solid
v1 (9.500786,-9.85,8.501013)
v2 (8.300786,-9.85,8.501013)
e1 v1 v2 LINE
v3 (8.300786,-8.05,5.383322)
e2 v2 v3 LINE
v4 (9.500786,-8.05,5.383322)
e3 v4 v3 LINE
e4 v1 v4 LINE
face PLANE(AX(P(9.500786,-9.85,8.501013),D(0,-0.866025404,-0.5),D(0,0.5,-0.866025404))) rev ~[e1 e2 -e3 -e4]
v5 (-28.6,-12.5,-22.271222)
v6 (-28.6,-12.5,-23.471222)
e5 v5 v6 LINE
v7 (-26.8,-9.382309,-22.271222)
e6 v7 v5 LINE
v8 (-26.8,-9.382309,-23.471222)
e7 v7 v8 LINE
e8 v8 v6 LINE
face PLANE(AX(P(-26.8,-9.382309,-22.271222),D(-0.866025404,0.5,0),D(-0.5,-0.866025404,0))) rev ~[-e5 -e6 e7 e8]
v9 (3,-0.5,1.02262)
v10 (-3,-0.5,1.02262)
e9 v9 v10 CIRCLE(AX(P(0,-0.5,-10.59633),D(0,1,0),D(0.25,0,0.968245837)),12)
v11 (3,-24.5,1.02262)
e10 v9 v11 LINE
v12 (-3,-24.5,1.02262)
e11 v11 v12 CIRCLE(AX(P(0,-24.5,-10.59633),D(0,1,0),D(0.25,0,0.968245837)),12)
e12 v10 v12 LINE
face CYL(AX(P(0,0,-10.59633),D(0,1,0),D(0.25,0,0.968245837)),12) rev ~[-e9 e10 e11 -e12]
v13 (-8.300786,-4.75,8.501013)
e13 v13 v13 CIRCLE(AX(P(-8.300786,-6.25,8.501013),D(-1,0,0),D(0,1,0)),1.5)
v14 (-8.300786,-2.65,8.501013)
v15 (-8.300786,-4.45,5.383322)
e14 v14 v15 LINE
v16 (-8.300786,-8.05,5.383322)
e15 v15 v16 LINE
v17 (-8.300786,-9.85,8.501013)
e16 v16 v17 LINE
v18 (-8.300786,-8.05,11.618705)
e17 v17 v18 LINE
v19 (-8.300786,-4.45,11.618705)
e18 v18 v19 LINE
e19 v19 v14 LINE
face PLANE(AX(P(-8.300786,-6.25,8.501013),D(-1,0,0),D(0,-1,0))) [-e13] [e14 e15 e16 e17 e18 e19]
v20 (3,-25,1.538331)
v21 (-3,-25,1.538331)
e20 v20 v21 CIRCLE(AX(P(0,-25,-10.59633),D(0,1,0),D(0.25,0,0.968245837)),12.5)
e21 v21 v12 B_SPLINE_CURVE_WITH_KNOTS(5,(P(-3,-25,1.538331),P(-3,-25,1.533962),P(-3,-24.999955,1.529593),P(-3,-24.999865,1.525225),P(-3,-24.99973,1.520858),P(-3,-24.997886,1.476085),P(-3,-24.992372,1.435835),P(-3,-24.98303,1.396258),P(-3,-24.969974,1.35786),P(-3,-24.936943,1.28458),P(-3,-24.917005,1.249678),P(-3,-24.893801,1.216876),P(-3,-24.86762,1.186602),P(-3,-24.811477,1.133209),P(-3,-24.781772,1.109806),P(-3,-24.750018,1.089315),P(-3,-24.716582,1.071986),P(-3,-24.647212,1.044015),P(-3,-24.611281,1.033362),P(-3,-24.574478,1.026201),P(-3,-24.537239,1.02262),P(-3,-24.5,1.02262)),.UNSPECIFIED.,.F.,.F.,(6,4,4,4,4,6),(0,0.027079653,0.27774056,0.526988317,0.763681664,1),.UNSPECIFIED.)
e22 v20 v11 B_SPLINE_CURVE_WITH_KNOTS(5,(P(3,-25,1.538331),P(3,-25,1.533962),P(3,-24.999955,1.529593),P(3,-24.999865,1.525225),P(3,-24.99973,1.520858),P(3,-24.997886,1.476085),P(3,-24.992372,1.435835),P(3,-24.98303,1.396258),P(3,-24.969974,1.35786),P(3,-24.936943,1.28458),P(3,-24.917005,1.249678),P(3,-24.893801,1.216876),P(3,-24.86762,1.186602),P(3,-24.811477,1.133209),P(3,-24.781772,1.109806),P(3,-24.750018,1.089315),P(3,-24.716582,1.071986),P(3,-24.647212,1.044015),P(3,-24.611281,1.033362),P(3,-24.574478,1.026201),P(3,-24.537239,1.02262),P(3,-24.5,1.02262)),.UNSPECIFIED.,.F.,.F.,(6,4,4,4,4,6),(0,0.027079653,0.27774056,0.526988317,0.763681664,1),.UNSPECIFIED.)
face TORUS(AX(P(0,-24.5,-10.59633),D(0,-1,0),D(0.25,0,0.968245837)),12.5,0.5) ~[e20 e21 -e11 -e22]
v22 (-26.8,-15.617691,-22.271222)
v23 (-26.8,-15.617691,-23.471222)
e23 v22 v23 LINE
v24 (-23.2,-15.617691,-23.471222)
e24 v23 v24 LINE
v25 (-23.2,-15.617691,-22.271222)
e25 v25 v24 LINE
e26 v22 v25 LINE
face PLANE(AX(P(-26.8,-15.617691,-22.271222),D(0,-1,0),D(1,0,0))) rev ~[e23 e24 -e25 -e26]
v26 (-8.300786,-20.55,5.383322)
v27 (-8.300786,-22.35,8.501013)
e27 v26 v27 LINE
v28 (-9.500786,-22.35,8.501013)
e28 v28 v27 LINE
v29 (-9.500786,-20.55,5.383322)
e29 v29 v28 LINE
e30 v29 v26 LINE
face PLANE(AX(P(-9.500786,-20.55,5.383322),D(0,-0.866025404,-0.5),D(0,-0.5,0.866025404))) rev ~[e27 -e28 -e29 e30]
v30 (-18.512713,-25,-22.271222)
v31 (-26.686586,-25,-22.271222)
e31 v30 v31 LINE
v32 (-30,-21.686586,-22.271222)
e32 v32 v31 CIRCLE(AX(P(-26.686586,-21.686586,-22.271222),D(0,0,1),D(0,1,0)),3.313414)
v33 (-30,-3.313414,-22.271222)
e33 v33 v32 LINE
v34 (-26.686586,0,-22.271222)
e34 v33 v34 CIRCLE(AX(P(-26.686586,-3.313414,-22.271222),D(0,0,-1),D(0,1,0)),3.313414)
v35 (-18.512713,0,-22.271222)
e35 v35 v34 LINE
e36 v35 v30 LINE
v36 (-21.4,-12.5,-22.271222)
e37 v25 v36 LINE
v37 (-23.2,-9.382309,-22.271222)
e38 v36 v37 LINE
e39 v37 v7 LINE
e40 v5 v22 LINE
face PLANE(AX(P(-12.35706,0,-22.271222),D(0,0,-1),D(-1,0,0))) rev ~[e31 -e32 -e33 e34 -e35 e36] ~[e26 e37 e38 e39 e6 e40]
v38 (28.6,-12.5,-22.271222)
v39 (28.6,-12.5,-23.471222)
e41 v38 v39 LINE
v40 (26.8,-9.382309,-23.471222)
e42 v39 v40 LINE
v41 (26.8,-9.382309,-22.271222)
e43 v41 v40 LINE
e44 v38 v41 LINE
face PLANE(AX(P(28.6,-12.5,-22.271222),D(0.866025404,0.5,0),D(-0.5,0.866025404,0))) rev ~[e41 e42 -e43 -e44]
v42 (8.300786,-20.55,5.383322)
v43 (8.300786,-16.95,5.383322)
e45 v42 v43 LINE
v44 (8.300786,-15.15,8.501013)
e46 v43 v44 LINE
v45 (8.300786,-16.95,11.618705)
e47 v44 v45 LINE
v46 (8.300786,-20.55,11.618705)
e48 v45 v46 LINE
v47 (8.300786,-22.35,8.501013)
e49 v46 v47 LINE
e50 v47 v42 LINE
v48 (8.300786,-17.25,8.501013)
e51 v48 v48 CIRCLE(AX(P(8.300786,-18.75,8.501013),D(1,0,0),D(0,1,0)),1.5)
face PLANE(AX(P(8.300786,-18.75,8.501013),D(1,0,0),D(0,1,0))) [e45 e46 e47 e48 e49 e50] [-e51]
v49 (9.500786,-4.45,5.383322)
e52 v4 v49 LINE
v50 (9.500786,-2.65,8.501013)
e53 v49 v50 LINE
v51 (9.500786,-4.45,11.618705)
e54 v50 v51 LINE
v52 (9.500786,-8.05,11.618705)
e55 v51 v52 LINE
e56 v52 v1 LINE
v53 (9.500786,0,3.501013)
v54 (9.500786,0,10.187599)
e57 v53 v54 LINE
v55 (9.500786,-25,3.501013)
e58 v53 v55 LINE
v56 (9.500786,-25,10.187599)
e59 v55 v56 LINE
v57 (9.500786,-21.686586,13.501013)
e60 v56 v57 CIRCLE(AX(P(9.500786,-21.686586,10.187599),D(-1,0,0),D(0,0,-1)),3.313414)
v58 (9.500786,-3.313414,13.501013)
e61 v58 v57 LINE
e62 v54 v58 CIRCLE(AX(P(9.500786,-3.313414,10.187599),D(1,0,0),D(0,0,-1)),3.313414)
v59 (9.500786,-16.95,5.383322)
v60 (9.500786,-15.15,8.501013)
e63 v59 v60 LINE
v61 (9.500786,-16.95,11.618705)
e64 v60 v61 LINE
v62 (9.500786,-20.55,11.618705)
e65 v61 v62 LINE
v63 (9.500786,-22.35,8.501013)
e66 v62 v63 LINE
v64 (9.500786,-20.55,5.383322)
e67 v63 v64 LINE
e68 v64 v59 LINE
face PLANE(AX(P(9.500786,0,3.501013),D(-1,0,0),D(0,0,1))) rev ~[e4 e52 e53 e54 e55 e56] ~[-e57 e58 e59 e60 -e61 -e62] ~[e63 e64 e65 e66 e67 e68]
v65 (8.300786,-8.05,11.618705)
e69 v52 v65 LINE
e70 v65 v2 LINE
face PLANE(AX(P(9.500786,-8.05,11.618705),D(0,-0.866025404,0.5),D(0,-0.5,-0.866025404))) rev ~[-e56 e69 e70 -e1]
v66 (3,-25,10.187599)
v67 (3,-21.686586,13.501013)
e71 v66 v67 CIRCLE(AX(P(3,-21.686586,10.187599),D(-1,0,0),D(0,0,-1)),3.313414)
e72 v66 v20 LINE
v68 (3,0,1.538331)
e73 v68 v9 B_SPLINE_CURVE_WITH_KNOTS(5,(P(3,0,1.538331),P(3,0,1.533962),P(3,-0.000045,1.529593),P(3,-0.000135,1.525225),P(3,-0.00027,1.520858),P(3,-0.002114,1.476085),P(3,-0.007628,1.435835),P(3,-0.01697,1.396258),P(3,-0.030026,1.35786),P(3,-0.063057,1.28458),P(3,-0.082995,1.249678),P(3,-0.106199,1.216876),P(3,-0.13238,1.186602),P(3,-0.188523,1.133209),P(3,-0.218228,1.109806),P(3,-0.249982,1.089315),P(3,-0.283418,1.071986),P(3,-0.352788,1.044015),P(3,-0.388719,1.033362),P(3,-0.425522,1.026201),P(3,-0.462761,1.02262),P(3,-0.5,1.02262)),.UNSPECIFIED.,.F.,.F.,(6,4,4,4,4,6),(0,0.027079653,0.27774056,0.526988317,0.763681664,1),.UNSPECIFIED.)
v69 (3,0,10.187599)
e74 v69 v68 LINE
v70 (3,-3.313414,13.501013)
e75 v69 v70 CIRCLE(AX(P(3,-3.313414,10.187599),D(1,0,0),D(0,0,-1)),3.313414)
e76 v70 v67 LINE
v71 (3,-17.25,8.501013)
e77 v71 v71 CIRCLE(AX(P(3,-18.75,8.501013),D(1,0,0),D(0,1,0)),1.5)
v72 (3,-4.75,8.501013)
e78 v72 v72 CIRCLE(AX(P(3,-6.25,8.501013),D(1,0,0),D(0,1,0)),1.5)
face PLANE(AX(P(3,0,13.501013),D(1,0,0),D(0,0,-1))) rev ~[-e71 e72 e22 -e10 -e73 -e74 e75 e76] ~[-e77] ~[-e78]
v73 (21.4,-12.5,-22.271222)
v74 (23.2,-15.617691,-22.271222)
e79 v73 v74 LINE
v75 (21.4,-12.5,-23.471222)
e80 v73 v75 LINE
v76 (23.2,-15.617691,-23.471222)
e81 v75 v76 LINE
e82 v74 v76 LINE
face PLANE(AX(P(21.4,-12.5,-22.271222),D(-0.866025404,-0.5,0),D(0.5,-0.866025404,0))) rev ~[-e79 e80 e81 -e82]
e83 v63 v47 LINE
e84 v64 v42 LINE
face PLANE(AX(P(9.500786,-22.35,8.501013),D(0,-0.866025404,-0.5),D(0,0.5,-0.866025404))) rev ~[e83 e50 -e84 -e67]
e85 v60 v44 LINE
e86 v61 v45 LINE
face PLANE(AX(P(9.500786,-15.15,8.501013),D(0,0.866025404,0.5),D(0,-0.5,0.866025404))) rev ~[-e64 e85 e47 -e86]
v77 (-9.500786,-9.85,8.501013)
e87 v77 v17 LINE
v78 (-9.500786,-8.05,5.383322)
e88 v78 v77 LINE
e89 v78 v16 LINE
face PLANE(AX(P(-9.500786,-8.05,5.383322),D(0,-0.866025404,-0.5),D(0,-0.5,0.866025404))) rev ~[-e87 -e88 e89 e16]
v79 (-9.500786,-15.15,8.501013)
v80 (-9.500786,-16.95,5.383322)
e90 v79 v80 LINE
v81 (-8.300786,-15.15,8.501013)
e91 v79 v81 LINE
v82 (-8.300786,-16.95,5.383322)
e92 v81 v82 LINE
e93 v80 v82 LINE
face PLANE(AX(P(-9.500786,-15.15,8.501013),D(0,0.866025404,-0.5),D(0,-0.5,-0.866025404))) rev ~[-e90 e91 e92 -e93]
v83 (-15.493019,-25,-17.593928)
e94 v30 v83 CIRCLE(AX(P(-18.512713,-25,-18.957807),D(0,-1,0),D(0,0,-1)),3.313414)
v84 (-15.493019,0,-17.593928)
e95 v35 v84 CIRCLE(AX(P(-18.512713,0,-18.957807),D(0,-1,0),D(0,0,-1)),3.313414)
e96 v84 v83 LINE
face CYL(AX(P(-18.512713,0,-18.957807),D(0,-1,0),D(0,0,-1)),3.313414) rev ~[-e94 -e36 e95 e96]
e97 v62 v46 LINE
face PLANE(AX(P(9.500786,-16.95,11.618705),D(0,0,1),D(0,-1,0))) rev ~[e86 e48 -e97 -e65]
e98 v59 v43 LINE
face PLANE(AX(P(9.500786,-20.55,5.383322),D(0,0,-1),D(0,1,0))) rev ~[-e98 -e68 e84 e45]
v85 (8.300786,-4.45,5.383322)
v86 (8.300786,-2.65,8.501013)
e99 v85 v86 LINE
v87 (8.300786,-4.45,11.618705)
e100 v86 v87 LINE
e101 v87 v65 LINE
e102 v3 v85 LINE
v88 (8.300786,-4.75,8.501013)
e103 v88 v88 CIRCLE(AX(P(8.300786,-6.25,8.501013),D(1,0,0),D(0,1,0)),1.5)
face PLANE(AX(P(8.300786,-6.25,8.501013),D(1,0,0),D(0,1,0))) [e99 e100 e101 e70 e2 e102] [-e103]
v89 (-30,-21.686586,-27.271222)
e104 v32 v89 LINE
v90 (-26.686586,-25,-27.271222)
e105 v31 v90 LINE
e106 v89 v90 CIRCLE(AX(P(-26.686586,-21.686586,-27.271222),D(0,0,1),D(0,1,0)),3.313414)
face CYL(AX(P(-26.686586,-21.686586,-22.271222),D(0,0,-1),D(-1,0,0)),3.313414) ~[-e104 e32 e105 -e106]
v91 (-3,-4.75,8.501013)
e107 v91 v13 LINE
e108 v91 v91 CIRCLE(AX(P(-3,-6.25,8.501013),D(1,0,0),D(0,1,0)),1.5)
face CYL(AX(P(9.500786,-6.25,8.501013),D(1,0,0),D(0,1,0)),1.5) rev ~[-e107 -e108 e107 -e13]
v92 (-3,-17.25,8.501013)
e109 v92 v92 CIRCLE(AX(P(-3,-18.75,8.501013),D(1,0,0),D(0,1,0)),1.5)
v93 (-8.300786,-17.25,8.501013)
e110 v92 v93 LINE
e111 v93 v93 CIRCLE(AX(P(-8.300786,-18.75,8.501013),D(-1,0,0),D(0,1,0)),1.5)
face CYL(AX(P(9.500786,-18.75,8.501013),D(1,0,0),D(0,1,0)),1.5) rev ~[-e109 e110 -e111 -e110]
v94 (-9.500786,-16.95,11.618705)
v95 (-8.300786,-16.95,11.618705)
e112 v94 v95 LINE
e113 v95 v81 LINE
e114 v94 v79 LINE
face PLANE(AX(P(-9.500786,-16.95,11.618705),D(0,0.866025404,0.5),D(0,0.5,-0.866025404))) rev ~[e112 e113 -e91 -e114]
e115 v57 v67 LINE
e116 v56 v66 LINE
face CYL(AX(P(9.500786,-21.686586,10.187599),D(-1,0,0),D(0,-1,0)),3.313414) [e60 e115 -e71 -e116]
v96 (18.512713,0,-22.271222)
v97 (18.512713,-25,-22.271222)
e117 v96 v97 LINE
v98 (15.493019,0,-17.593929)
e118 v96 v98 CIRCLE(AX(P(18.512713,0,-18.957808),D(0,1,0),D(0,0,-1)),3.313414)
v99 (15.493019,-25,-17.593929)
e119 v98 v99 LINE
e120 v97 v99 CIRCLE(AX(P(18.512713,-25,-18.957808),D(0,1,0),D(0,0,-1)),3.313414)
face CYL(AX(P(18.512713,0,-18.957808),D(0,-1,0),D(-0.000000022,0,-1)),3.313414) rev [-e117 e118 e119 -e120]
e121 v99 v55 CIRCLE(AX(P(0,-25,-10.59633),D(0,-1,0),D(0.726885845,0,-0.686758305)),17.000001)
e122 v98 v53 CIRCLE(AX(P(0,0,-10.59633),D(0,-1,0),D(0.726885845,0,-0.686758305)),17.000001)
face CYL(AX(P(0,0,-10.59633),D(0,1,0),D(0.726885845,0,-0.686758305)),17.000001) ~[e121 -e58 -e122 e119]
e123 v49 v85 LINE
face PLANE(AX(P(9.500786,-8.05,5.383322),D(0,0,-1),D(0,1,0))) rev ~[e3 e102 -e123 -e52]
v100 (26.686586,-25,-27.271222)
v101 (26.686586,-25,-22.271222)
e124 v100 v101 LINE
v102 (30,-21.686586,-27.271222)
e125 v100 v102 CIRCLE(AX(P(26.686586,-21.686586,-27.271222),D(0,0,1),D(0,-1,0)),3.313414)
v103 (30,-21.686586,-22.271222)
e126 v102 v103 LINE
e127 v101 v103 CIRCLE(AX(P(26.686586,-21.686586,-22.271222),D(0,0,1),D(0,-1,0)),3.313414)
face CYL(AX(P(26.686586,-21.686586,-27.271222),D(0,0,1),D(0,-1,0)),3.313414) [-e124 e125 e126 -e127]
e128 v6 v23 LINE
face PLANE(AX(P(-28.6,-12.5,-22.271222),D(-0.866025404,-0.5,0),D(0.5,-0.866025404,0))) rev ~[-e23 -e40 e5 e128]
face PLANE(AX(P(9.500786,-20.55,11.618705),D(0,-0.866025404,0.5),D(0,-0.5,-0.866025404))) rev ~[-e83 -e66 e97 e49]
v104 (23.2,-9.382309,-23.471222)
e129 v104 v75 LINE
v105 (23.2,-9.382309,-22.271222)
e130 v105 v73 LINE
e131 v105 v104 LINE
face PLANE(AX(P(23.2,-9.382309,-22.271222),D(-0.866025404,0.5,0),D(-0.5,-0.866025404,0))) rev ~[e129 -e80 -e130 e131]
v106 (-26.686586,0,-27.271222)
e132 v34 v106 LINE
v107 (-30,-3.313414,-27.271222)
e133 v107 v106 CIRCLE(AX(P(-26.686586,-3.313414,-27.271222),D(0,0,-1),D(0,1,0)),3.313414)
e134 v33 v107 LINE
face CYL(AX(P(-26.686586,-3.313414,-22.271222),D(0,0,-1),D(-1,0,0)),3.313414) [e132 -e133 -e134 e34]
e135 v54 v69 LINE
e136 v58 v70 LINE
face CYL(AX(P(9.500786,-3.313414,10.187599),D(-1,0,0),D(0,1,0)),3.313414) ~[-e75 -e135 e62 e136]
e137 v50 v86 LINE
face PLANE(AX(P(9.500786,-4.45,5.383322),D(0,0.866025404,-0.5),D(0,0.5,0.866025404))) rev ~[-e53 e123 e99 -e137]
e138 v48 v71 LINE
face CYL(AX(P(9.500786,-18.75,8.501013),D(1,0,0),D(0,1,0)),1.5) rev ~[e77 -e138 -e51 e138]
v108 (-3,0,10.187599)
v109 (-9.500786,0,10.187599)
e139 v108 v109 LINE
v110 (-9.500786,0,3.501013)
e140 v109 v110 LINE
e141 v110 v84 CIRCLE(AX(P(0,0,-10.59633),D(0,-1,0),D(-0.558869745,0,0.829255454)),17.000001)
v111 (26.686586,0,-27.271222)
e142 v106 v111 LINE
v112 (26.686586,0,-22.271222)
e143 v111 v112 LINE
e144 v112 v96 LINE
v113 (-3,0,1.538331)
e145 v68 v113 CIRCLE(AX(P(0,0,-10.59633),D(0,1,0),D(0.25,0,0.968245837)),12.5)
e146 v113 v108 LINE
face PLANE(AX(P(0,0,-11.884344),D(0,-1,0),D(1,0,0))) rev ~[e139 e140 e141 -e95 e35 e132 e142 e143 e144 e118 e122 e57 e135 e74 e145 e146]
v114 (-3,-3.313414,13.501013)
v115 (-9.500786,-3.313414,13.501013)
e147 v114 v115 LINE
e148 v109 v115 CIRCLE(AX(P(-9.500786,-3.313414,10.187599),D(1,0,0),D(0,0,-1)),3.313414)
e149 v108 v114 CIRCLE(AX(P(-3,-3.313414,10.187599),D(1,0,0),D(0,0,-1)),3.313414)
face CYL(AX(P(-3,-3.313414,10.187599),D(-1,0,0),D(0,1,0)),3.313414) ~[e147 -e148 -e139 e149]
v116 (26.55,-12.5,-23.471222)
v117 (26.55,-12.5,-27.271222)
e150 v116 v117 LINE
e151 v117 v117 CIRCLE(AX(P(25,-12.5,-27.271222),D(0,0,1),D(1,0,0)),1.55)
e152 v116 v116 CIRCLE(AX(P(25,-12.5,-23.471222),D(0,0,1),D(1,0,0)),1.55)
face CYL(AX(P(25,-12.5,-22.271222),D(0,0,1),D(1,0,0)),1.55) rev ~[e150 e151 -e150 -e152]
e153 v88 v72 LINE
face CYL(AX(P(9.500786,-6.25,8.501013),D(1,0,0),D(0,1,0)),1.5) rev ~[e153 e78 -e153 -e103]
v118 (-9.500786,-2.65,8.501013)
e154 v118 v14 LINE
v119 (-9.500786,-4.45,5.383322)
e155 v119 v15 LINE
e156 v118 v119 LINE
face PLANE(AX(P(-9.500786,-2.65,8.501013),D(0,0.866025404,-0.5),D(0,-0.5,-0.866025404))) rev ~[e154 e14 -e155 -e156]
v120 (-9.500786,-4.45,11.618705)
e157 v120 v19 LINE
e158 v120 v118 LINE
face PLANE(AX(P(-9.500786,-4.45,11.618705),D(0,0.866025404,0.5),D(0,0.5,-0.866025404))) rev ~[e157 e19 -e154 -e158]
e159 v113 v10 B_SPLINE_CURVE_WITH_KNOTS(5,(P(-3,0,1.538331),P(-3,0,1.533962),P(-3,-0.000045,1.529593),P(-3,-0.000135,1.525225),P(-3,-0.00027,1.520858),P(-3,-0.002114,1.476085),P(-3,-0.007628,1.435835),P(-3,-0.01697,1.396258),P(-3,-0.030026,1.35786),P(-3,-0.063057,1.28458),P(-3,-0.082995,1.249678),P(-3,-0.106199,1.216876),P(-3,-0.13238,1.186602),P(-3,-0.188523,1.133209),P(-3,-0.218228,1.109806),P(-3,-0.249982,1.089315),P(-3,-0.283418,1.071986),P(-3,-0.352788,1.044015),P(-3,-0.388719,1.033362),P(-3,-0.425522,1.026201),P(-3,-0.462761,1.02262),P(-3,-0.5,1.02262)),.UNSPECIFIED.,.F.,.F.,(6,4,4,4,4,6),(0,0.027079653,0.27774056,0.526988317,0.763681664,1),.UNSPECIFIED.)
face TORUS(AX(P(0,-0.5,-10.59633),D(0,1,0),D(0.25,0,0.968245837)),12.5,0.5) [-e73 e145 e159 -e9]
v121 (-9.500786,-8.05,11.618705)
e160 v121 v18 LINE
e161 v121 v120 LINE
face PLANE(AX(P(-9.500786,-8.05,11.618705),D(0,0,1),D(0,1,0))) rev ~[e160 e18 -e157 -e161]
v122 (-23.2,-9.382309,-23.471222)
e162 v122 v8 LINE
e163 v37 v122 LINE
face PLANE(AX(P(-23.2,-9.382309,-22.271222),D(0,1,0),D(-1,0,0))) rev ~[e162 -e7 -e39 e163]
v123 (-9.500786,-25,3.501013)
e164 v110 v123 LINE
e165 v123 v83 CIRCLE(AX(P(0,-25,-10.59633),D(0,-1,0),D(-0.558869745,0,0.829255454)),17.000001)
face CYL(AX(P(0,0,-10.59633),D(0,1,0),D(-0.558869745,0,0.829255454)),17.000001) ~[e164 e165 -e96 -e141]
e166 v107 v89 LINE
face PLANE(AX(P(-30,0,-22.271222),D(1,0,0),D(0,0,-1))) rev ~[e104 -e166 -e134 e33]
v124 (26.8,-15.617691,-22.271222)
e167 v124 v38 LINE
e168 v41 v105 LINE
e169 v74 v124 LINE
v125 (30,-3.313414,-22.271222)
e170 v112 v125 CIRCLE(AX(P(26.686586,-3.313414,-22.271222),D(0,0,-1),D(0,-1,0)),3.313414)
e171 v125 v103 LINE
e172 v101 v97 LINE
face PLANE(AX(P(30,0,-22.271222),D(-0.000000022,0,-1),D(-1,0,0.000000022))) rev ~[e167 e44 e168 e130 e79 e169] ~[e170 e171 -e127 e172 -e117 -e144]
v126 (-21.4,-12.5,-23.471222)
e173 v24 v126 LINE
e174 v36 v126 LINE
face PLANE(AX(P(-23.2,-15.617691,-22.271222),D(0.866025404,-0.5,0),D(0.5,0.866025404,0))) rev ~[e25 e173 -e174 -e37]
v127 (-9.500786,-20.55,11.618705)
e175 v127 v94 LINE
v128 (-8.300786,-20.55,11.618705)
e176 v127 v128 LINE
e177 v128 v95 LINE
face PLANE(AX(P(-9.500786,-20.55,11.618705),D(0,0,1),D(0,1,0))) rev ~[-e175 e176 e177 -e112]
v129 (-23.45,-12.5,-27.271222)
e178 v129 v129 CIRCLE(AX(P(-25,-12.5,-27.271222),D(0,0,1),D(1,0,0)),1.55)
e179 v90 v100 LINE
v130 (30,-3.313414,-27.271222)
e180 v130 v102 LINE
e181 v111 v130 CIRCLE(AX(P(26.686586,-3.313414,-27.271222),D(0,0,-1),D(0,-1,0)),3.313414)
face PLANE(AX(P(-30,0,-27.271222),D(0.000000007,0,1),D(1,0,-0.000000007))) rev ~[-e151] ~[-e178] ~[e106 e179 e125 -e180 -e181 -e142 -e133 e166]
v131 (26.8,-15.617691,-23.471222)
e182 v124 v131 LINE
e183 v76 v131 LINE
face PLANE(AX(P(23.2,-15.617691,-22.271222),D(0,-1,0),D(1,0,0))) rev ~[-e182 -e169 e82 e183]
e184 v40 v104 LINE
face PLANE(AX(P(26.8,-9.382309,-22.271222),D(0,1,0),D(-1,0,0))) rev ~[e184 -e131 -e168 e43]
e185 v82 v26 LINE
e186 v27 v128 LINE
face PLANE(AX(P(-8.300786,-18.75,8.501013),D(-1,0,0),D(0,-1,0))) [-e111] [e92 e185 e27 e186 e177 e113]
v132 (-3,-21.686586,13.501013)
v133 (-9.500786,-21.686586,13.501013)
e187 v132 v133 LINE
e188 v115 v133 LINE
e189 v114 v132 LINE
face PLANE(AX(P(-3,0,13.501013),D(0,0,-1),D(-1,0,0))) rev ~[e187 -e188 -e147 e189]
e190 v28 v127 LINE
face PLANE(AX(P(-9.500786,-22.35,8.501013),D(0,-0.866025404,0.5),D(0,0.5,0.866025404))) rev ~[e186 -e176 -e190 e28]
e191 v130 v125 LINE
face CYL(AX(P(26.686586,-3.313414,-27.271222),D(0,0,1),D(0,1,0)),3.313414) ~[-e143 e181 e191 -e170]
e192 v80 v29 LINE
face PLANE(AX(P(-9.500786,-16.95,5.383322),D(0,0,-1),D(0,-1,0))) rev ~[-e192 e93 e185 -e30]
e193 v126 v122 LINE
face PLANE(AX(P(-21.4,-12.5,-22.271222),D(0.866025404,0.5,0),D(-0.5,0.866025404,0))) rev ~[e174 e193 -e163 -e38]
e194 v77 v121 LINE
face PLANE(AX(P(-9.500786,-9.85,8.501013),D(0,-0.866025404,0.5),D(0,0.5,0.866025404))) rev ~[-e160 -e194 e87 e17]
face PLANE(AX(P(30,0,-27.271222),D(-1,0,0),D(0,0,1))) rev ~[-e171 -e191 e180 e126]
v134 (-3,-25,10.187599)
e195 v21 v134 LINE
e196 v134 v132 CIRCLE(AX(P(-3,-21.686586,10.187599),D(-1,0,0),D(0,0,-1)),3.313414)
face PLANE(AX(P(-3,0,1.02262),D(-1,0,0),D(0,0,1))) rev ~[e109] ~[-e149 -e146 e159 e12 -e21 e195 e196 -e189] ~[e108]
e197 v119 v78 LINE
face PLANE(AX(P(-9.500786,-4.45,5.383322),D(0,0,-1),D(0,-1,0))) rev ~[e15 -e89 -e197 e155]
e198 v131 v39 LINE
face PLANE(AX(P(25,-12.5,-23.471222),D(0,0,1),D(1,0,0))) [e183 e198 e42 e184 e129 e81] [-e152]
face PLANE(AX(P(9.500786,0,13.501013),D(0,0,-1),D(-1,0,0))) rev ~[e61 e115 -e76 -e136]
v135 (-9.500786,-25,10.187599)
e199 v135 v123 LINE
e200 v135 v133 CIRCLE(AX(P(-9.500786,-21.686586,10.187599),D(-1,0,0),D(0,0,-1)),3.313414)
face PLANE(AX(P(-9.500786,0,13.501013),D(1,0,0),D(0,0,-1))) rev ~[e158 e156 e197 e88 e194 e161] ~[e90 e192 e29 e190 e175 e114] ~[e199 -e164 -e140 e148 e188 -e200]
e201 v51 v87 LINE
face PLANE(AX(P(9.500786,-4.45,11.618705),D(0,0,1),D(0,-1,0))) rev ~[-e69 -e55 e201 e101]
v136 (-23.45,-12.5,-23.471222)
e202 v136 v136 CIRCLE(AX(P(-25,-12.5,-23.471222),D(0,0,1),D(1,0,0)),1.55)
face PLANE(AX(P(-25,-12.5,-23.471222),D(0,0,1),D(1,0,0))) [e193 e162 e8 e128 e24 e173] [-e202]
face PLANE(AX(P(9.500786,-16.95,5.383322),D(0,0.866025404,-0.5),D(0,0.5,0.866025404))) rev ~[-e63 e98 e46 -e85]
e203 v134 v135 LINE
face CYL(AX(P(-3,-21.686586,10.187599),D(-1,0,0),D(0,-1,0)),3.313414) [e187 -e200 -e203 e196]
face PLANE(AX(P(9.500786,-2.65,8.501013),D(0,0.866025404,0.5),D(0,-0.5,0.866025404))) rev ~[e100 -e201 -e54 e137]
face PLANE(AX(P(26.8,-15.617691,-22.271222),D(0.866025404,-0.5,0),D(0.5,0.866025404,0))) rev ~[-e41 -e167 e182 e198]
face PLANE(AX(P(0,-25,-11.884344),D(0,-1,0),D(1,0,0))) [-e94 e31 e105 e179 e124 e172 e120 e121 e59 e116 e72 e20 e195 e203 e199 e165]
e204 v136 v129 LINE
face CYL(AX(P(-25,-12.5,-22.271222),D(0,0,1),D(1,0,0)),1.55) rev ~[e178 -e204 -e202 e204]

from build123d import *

# Parameters (mm, degrees)
F1_DEPTH  = 25
F2_R      = 1.55
F3_DEPTH  = 25
F4_R      = 1.5
F5_DEPTH  = 25
F6_R      = 3.3134143982
F9_DEPTH  = 1.2
F8_R      = 1.5
F10_DEPTH = 1.2
F12_DEPTH = 1.2
F13_R     = 0.5


# Not quite as in the source:
# - ends of sketch curves that miss each other by under 0.0002 mm in the source are joined


with BuildPart() as f1:
    # F0 (on Front) → F1 (new body)
    with BuildSketch(Plane.XZ):
        with BuildLine():
            Line((-30, -27.2712218283), (30, -27.271222222))
            Line((30, -27.271222222), (30, -22.271222222))
            Line((30, -22.271222222), (12.3570600307, -22.2712218283))
            ThreePointArc((12.3570600307, -22.2712218283), (16.8965495982, -8.7237267257), (9.5007861894, 3.5010134632))
            Line((9.5007861894, 3.5010134632), (9.5007861894, 13.5010134632))
            Line((9.5007861894, 13.5010134632), (3, 13.5010134632))
            Line((3, 13.5010134632), (3, 6.1368714524))
            Line((3, 6.1368714524), (3, 4.8868714524))
            Line((3, 4.8868714524), (3, 1.0226200218))
            ThreePointArc((3, 1.0226200218), (0, -22.5963300169), (-3, 1.0226200218))
            Line((-3, 1.0226200218), (-3, 4.8868714524))
            Line((-3, 4.8868714524), (-3, 13.5010134632))
            Line((-3, 13.5010134632), (-9.5007861894, 13.5010134632))
            Line((-9.5007861894, 13.5010134632), (-9.5007861894, 3.5010134632))
            ThreePointArc((-9.5007861894, 3.5010134632), (-16.8965495982, -8.7237267257), (-12.3570600307, -22.2712218283))
            Line((-12.3570600307, -22.2712218283), (-30, -22.2712218283))
            Line((-30, -22.2712218283), (-30, -27.2712218283))
        make_face()
    extrude(amount=F1_DEPTH)

    # F2 (on face) → F3 (cut)
    with BuildSketch(Plane.XY.offset(-22.2712218283)):
        with Locations((-25, -12.5)):
            Circle(F2_R)
        with Locations((25, -12.5)):
            Circle(F2_R)
    extrude(amount=-F3_DEPTH, mode=Mode.SUBTRACT)

    # F4 (on face) → F5 (cut)
    with BuildSketch(Plane.YZ.offset(9.5007861894)):
        with Locations((-18.75, 8.5010134632)):
            Circle(F4_R)
        with Locations((-6.25, 8.5010134632)):
            Circle(F4_R)
    extrude(amount=-F5_DEPTH, mode=Mode.SUBTRACT)

    # F6
    f6_edges = [f1.edges().sort_by_distance(p)[0] for p in [
        (-6.250393, -25, 13.501013),
        (6.250393, -25, 13.501013),
        (-6.250393, 0, 13.501013),
        (6.250393, 0, 13.501013),
        (30, -25, -24.771222),
        (30, 0, -24.771222),
        (-30, 0, -24.771222),
        (-30, -25, -24.771222),
        (12.35706, -12.5, -22.271222),
        (-12.35706, -12.5, -22.271222),
    ]]
    fillet(f6_edges, radius=F6_R)

    # F7 (on face) → F9 (cut)
    with BuildSketch(Plane.YZ.offset(9.5007861894)):
        Polygon((-20.55, 5.3833220096), (-16.95, 5.3833220096), (-15.15, 8.5010134632), (-16.95, 11.6187049168), (-20.55, 11.6187049168), (-22.35, 8.5010134632), align=None)
        Polygon((-4.45, 11.6187049168), (-8.05, 11.6187049168), (-9.85, 8.5010134632), (-8.05, 5.3833220096), (-4.45, 5.3833220096), (-2.65, 8.5010134632), align=None)
    extrude(amount=-F9_DEPTH, mode=Mode.SUBTRACT)

    # F8 (on face) → F10 (cut)
    with BuildSketch(Plane(origin=(-9.5007861894, 0, 0), x_dir=(0, -1, 0), z_dir=(-1, 0, 0))):
        Polygon((4.45, 5.3833220096), (8.05, 5.3833220096), (9.85, 8.5010134632), (8.05, 11.6187049168), (4.45, 11.6187049168), (2.65, 8.5010134632), align=None)
        with Locations((6.25, 8.5010134632)):
            Circle(F8_R, mode=Mode.SUBTRACT)
        Polygon((20.55, 11.6187049168), (16.95, 11.6187049168), (15.15, 8.5010134632), (16.95, 5.3833220096), (20.55, 5.3833220096), (22.35, 8.5010134632), align=None)
        with Locations((18.75, 8.5010134632)):
            Circle(F8_R, mode=Mode.SUBTRACT)
    extrude(amount=-F10_DEPTH, mode=Mode.SUBTRACT)

    # F11 (on face) → F12 (cut)
    with BuildSketch(Plane.XY.offset(-22.2712218283)):
        Polygon((26.8, -9.3823085464), (23.2, -9.3823085464), (21.4, -12.5), (23.2, -15.6176914536), (26.8, -15.6176914536), (28.6, -12.5), align=None)
        Polygon((-23.2, -15.6176914536), (-21.4, -12.5), (-23.2, -9.3823085464), (-26.8, -9.3823085464), (-28.6, -12.5), (-26.8, -15.6176914536), align=None)
    extrude(amount=-F12_DEPTH, mode=Mode.SUBTRACT)

    # F13
    f13_edges = [f1.edges().sort_by_distance(p)[0] for p in [
        (0, 0, -22.59633),
        (0, -25, -22.59633),
    ]]
    fillet(f13_edges, radius=F13_R)


solid = f1.part
